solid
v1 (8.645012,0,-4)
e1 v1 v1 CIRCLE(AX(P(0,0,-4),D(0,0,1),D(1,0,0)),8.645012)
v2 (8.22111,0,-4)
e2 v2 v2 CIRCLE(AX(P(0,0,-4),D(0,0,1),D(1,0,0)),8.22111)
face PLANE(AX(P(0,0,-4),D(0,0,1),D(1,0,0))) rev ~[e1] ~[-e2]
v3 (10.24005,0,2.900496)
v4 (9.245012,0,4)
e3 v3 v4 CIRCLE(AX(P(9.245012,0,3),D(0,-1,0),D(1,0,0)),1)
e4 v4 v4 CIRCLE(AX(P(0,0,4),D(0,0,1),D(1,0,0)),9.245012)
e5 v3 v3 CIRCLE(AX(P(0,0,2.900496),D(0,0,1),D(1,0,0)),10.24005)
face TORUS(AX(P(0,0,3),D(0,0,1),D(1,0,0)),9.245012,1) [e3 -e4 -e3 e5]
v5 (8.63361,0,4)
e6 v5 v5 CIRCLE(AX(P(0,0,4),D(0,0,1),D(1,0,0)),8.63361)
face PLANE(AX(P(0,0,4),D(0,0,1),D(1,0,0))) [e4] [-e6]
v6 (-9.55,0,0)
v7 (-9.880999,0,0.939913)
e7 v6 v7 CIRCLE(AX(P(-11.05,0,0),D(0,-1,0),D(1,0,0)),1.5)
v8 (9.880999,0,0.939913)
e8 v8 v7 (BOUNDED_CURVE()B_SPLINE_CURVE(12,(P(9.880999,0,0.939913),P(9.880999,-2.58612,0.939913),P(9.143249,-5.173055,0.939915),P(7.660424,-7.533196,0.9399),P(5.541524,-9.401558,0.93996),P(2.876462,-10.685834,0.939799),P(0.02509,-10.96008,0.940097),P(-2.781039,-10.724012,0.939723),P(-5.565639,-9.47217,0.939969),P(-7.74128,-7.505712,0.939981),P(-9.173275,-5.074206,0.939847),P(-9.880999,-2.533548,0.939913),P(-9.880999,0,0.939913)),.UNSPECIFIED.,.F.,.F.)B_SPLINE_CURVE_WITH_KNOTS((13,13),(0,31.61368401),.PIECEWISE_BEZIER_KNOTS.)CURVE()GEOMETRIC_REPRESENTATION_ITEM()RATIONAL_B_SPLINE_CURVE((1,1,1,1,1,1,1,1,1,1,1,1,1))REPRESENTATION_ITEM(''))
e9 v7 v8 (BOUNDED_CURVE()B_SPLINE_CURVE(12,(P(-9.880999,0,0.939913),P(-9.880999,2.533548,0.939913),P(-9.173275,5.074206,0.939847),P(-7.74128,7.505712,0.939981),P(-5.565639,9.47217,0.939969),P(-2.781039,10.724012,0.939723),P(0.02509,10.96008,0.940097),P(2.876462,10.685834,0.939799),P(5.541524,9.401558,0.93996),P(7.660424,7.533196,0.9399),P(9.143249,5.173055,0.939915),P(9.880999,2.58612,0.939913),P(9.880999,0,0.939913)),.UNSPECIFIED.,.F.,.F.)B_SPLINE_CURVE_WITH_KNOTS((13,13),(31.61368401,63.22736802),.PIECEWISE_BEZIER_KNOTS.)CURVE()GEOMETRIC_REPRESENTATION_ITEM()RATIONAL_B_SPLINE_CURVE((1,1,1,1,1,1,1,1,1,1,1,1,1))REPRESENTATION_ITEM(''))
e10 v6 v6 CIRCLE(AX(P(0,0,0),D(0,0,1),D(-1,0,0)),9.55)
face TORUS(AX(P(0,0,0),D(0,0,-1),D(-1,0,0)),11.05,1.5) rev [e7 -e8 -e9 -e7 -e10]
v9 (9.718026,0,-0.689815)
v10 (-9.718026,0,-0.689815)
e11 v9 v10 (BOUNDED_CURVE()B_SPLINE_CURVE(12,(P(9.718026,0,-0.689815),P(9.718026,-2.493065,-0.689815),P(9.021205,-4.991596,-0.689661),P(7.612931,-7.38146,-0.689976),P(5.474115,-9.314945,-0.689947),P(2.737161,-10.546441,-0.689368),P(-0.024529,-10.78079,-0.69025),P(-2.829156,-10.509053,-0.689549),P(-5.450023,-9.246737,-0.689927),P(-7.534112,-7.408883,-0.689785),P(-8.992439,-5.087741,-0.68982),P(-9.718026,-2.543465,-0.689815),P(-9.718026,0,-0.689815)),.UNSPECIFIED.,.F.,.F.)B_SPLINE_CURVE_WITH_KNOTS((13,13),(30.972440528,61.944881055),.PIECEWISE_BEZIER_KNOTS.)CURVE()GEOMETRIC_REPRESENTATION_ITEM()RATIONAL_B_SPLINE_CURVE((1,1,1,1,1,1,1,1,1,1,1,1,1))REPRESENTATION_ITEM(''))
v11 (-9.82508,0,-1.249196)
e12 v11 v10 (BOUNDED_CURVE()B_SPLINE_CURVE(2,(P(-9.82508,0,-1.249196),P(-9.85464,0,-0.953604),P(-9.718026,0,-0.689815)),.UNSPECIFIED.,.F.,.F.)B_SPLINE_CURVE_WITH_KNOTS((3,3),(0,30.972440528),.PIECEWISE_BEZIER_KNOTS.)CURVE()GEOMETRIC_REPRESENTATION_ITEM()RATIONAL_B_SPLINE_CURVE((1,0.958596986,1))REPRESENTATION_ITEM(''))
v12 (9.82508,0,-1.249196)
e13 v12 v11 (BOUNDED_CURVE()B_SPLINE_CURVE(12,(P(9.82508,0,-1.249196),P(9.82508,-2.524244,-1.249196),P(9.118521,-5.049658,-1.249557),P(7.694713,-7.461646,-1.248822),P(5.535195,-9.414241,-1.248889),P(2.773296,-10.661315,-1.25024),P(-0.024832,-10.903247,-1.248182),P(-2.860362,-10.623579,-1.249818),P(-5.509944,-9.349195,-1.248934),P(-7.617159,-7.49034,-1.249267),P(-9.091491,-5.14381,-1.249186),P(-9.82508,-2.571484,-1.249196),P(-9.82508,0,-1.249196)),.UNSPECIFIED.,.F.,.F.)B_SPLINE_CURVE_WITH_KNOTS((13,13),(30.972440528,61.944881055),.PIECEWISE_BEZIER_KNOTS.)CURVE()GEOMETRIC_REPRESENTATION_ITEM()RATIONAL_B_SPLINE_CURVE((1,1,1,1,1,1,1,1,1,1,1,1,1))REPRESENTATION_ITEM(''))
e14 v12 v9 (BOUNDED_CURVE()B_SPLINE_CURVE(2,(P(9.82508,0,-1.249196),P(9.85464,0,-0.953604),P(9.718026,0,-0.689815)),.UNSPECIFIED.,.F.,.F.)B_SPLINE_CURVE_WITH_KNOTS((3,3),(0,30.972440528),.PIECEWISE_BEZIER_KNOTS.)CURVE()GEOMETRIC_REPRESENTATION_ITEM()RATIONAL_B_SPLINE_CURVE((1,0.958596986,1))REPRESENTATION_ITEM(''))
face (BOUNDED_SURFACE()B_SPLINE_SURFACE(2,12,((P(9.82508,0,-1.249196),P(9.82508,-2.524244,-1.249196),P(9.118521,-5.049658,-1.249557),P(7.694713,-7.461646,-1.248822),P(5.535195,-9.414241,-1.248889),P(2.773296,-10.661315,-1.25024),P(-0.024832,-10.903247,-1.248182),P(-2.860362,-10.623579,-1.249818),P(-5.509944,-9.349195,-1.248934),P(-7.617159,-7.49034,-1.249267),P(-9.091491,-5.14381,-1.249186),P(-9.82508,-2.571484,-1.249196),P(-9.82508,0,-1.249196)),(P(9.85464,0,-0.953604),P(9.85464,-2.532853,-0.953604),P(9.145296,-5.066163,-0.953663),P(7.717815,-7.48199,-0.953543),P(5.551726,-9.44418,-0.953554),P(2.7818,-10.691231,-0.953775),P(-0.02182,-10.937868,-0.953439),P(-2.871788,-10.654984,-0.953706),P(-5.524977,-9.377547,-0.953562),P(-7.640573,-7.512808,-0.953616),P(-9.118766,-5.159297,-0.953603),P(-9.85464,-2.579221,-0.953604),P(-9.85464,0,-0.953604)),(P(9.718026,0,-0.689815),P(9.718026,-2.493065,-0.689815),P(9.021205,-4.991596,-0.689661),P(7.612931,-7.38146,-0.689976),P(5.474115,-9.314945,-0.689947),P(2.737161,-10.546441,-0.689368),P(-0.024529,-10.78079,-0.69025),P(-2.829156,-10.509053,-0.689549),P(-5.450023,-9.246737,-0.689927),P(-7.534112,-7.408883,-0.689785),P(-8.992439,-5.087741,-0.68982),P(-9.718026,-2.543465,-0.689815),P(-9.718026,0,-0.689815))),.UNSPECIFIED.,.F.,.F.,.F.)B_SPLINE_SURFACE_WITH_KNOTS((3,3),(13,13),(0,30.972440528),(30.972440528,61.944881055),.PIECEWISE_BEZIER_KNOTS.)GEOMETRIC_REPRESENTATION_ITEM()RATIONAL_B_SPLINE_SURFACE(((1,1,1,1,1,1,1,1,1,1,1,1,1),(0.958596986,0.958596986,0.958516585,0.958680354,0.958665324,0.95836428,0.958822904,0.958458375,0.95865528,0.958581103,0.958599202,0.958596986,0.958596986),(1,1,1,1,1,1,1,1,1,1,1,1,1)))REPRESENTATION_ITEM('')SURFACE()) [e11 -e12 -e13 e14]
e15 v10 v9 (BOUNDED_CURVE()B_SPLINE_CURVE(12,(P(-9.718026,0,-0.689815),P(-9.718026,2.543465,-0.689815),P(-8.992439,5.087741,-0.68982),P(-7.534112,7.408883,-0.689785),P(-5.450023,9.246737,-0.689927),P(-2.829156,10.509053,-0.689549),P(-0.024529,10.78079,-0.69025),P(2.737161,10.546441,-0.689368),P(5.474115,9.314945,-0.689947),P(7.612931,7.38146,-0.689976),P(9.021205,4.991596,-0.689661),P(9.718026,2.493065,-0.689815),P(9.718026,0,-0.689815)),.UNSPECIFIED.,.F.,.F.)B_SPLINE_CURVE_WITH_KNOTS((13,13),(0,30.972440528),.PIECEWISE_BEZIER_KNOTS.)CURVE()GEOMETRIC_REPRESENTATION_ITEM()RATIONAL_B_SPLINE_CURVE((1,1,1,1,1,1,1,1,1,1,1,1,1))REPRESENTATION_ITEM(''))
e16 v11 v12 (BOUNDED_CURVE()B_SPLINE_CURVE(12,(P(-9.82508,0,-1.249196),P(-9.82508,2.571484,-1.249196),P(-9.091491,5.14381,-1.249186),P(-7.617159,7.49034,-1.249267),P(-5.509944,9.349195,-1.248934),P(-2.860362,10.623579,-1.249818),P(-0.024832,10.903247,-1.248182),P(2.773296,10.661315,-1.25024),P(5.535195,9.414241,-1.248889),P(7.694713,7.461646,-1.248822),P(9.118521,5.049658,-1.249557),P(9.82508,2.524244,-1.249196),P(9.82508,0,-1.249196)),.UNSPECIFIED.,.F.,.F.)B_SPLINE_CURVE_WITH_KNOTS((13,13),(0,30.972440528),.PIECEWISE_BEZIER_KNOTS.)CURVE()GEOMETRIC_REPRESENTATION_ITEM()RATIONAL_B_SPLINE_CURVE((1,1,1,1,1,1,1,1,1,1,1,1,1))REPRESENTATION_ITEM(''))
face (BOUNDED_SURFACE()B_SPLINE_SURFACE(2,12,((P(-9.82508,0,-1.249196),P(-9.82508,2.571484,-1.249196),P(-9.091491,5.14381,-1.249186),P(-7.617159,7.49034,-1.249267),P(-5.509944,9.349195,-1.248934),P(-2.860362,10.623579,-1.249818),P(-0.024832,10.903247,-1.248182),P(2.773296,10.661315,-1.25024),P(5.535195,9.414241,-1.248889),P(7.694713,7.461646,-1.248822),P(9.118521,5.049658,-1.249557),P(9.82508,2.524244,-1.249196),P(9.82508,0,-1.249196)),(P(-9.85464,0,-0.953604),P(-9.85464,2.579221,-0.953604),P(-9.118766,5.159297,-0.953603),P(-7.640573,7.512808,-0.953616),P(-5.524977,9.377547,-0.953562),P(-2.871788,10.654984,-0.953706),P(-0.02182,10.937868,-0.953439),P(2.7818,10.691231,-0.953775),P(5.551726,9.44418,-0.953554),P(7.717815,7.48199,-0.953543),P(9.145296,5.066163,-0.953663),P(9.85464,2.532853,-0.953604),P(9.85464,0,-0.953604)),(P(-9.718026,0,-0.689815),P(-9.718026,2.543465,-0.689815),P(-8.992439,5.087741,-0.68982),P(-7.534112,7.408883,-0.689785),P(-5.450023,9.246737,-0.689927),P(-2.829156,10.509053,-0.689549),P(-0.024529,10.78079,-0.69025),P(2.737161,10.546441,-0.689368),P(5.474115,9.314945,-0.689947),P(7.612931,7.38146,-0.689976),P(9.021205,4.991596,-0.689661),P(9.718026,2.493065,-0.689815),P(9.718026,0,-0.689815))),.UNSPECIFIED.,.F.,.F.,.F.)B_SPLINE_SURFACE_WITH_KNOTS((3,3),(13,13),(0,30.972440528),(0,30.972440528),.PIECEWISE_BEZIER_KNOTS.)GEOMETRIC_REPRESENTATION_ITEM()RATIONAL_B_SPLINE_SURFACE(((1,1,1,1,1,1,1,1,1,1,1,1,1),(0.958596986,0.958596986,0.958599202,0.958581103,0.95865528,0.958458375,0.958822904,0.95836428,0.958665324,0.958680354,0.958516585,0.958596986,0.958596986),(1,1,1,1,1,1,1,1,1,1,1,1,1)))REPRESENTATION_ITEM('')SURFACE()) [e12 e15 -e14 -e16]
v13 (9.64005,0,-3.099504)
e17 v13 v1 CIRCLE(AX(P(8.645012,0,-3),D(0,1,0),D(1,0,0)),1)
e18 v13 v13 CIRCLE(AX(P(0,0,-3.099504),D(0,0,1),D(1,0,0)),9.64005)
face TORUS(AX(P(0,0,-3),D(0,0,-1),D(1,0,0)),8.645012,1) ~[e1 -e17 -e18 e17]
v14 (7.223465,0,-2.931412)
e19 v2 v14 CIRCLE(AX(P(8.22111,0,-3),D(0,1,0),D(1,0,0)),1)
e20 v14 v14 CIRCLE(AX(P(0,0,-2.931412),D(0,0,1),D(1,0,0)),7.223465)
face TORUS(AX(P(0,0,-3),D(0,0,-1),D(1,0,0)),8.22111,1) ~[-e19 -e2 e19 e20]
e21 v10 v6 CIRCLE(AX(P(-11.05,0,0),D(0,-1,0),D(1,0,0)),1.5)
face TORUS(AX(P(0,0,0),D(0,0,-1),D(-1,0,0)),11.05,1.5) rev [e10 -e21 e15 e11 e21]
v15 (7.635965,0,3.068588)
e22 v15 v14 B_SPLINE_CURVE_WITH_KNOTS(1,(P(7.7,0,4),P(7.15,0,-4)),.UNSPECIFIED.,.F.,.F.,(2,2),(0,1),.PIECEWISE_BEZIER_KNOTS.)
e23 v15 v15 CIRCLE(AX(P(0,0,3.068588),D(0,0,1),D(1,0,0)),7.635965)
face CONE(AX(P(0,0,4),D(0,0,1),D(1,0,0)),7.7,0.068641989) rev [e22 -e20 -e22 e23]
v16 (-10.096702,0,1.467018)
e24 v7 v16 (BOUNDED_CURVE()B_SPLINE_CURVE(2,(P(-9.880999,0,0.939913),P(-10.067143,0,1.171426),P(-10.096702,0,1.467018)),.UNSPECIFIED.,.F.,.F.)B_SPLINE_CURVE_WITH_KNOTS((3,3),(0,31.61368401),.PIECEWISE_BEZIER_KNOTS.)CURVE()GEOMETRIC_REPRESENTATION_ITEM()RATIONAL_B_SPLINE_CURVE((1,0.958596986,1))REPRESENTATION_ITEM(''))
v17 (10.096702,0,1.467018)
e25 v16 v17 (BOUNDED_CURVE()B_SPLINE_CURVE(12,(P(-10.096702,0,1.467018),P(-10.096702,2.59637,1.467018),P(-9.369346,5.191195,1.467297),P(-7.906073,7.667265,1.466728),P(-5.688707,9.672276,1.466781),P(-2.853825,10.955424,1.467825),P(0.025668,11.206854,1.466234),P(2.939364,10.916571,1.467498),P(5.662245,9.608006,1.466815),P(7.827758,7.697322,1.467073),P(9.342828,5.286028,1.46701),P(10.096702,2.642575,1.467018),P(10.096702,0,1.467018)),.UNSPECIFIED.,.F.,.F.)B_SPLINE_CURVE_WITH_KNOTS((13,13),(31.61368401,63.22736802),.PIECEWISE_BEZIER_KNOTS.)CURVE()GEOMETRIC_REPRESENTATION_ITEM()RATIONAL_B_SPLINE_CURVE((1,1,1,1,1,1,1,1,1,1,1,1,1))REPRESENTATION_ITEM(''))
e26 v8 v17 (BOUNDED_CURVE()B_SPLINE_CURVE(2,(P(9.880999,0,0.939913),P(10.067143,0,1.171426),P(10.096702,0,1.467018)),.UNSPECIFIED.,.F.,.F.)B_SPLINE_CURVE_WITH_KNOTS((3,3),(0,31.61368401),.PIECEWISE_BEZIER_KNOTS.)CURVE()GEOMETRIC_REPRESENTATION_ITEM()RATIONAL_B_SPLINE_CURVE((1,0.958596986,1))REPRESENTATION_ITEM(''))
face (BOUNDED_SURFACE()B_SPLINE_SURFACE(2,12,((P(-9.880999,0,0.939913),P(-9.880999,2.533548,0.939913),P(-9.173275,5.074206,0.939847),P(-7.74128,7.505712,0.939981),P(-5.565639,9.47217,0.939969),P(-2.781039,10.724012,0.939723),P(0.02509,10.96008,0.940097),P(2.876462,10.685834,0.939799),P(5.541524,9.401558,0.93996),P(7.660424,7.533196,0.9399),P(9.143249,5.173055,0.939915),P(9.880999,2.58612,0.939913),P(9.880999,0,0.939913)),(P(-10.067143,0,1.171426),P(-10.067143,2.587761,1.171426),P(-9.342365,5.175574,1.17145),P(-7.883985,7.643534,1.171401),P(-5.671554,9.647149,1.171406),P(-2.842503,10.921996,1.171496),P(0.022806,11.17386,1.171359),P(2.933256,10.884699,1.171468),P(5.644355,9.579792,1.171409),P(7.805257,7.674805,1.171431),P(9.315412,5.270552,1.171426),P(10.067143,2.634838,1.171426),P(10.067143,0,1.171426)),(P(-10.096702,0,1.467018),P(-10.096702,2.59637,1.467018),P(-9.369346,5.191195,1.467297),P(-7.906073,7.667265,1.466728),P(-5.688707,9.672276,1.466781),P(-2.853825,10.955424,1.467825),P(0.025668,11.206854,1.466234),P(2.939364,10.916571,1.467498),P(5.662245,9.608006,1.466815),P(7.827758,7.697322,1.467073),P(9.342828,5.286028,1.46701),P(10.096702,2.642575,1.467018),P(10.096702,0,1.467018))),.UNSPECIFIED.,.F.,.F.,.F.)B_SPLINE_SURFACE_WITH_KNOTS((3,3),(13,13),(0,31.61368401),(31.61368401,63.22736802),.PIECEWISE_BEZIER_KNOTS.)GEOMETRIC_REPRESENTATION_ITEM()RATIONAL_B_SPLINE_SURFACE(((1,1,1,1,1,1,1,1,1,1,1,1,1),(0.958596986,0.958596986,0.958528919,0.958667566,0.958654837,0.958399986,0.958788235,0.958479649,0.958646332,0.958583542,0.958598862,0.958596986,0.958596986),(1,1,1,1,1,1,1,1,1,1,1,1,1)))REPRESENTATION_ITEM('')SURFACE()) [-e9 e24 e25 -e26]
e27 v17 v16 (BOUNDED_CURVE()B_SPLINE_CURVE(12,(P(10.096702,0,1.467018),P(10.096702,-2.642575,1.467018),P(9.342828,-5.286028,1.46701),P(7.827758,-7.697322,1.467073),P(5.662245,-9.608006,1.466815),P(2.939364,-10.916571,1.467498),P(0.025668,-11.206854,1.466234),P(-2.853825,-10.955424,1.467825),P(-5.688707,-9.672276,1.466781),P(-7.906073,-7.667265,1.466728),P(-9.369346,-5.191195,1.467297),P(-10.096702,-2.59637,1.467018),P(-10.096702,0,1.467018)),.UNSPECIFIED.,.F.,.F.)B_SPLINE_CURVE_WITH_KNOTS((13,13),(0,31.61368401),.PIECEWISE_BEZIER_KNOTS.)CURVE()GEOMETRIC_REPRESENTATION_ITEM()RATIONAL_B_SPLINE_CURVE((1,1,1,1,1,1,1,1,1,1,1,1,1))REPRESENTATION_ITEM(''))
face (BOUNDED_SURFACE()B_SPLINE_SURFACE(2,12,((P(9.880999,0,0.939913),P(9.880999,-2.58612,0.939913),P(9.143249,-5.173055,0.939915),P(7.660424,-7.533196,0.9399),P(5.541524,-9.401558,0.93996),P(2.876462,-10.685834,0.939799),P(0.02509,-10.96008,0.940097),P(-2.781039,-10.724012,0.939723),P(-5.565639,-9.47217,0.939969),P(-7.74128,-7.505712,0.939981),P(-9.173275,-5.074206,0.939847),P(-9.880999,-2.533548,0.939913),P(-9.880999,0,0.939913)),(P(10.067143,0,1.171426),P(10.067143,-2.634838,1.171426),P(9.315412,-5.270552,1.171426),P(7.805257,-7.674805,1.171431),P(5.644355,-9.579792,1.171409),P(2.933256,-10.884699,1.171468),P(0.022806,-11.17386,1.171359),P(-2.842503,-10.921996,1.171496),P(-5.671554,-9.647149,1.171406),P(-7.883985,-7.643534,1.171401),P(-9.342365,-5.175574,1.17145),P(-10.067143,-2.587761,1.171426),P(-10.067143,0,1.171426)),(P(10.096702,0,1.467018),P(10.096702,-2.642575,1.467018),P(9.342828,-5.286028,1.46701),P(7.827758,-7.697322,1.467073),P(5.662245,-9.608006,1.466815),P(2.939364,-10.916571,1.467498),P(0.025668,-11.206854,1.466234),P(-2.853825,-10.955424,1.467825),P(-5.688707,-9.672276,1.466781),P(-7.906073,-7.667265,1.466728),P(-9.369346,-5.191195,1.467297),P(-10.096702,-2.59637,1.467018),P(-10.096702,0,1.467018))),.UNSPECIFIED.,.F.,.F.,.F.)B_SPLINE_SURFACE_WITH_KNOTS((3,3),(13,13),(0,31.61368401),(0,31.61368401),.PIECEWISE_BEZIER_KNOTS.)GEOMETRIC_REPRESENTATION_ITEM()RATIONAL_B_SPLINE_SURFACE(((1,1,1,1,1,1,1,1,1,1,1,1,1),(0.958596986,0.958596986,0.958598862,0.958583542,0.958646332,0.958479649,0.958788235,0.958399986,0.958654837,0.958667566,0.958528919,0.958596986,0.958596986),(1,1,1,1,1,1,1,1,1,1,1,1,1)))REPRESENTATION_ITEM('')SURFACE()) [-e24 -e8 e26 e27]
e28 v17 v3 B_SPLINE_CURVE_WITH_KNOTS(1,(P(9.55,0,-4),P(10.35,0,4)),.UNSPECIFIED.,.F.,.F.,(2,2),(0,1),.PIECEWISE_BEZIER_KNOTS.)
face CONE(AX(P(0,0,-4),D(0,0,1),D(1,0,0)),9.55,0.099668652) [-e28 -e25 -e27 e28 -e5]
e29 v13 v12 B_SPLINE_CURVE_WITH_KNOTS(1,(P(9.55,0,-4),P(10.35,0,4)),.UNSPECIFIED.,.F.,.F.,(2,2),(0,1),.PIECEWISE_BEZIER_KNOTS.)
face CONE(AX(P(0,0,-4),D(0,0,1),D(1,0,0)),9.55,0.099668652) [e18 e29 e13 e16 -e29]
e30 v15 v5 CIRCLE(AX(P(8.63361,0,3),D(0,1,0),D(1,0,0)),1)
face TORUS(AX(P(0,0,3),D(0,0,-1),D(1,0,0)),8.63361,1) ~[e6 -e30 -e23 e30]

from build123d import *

# Parameters (mm, degrees)
F1_R  = 1.5
F5_R  = 9.55
F6_R  = 10.35
F8_R  = 7.7
F9_R  = 7.15
F12_R = 1


with BuildPart() as f2:
    # F1 (on Front) → F2 (revolve)
    with BuildSketch(Plane.XZ):
        with Locations((-11.05, 0)):
            Circle(F1_R)
    revolve(axis=Axis((0, 0, 0), (0, 0, 1)))


with BuildPart() as f7:
    # F5 (on offset) → F7 section 0
    with BuildSketch(Plane.XY.offset(-4)):
        Circle(F5_R)
    # F6 (on offset) → F7 section 1
    with BuildSketch(Plane.XY.offset(4)):
        Circle(F6_R)
    loft()

    # F8 (on face) → F10 section 0
    with BuildSketch(Plane.XY.offset(4)):
        Circle(F8_R)
    # F9 (on face) → F10 section 1
    with BuildSketch(Plane.XY.offset(-4)):
        Circle(F9_R)
    loft(mode=Mode.SUBTRACT)

    # F11: cut F2
    add(f2.part, mode=Mode.SUBTRACT)

    # F12
    f12_edges = [f7.edges().sort_by_distance(p)[0] for p in [
        (-7.7, 0, 4),
        (-10.35, 0, 4),
        (9.55, 0, 0),
        (-9.55, 0, -4),
        (-7.15, 0, -4),
        (0, 9.858834, -0.91166),
        (0, -9.858834, -0.91166),
        (0, -10.062948, 1.129482),
        (0, 10.062948, 1.129482),
    ]]
    fillet(f12_edges, radius=F12_R)


solid = f7.part
